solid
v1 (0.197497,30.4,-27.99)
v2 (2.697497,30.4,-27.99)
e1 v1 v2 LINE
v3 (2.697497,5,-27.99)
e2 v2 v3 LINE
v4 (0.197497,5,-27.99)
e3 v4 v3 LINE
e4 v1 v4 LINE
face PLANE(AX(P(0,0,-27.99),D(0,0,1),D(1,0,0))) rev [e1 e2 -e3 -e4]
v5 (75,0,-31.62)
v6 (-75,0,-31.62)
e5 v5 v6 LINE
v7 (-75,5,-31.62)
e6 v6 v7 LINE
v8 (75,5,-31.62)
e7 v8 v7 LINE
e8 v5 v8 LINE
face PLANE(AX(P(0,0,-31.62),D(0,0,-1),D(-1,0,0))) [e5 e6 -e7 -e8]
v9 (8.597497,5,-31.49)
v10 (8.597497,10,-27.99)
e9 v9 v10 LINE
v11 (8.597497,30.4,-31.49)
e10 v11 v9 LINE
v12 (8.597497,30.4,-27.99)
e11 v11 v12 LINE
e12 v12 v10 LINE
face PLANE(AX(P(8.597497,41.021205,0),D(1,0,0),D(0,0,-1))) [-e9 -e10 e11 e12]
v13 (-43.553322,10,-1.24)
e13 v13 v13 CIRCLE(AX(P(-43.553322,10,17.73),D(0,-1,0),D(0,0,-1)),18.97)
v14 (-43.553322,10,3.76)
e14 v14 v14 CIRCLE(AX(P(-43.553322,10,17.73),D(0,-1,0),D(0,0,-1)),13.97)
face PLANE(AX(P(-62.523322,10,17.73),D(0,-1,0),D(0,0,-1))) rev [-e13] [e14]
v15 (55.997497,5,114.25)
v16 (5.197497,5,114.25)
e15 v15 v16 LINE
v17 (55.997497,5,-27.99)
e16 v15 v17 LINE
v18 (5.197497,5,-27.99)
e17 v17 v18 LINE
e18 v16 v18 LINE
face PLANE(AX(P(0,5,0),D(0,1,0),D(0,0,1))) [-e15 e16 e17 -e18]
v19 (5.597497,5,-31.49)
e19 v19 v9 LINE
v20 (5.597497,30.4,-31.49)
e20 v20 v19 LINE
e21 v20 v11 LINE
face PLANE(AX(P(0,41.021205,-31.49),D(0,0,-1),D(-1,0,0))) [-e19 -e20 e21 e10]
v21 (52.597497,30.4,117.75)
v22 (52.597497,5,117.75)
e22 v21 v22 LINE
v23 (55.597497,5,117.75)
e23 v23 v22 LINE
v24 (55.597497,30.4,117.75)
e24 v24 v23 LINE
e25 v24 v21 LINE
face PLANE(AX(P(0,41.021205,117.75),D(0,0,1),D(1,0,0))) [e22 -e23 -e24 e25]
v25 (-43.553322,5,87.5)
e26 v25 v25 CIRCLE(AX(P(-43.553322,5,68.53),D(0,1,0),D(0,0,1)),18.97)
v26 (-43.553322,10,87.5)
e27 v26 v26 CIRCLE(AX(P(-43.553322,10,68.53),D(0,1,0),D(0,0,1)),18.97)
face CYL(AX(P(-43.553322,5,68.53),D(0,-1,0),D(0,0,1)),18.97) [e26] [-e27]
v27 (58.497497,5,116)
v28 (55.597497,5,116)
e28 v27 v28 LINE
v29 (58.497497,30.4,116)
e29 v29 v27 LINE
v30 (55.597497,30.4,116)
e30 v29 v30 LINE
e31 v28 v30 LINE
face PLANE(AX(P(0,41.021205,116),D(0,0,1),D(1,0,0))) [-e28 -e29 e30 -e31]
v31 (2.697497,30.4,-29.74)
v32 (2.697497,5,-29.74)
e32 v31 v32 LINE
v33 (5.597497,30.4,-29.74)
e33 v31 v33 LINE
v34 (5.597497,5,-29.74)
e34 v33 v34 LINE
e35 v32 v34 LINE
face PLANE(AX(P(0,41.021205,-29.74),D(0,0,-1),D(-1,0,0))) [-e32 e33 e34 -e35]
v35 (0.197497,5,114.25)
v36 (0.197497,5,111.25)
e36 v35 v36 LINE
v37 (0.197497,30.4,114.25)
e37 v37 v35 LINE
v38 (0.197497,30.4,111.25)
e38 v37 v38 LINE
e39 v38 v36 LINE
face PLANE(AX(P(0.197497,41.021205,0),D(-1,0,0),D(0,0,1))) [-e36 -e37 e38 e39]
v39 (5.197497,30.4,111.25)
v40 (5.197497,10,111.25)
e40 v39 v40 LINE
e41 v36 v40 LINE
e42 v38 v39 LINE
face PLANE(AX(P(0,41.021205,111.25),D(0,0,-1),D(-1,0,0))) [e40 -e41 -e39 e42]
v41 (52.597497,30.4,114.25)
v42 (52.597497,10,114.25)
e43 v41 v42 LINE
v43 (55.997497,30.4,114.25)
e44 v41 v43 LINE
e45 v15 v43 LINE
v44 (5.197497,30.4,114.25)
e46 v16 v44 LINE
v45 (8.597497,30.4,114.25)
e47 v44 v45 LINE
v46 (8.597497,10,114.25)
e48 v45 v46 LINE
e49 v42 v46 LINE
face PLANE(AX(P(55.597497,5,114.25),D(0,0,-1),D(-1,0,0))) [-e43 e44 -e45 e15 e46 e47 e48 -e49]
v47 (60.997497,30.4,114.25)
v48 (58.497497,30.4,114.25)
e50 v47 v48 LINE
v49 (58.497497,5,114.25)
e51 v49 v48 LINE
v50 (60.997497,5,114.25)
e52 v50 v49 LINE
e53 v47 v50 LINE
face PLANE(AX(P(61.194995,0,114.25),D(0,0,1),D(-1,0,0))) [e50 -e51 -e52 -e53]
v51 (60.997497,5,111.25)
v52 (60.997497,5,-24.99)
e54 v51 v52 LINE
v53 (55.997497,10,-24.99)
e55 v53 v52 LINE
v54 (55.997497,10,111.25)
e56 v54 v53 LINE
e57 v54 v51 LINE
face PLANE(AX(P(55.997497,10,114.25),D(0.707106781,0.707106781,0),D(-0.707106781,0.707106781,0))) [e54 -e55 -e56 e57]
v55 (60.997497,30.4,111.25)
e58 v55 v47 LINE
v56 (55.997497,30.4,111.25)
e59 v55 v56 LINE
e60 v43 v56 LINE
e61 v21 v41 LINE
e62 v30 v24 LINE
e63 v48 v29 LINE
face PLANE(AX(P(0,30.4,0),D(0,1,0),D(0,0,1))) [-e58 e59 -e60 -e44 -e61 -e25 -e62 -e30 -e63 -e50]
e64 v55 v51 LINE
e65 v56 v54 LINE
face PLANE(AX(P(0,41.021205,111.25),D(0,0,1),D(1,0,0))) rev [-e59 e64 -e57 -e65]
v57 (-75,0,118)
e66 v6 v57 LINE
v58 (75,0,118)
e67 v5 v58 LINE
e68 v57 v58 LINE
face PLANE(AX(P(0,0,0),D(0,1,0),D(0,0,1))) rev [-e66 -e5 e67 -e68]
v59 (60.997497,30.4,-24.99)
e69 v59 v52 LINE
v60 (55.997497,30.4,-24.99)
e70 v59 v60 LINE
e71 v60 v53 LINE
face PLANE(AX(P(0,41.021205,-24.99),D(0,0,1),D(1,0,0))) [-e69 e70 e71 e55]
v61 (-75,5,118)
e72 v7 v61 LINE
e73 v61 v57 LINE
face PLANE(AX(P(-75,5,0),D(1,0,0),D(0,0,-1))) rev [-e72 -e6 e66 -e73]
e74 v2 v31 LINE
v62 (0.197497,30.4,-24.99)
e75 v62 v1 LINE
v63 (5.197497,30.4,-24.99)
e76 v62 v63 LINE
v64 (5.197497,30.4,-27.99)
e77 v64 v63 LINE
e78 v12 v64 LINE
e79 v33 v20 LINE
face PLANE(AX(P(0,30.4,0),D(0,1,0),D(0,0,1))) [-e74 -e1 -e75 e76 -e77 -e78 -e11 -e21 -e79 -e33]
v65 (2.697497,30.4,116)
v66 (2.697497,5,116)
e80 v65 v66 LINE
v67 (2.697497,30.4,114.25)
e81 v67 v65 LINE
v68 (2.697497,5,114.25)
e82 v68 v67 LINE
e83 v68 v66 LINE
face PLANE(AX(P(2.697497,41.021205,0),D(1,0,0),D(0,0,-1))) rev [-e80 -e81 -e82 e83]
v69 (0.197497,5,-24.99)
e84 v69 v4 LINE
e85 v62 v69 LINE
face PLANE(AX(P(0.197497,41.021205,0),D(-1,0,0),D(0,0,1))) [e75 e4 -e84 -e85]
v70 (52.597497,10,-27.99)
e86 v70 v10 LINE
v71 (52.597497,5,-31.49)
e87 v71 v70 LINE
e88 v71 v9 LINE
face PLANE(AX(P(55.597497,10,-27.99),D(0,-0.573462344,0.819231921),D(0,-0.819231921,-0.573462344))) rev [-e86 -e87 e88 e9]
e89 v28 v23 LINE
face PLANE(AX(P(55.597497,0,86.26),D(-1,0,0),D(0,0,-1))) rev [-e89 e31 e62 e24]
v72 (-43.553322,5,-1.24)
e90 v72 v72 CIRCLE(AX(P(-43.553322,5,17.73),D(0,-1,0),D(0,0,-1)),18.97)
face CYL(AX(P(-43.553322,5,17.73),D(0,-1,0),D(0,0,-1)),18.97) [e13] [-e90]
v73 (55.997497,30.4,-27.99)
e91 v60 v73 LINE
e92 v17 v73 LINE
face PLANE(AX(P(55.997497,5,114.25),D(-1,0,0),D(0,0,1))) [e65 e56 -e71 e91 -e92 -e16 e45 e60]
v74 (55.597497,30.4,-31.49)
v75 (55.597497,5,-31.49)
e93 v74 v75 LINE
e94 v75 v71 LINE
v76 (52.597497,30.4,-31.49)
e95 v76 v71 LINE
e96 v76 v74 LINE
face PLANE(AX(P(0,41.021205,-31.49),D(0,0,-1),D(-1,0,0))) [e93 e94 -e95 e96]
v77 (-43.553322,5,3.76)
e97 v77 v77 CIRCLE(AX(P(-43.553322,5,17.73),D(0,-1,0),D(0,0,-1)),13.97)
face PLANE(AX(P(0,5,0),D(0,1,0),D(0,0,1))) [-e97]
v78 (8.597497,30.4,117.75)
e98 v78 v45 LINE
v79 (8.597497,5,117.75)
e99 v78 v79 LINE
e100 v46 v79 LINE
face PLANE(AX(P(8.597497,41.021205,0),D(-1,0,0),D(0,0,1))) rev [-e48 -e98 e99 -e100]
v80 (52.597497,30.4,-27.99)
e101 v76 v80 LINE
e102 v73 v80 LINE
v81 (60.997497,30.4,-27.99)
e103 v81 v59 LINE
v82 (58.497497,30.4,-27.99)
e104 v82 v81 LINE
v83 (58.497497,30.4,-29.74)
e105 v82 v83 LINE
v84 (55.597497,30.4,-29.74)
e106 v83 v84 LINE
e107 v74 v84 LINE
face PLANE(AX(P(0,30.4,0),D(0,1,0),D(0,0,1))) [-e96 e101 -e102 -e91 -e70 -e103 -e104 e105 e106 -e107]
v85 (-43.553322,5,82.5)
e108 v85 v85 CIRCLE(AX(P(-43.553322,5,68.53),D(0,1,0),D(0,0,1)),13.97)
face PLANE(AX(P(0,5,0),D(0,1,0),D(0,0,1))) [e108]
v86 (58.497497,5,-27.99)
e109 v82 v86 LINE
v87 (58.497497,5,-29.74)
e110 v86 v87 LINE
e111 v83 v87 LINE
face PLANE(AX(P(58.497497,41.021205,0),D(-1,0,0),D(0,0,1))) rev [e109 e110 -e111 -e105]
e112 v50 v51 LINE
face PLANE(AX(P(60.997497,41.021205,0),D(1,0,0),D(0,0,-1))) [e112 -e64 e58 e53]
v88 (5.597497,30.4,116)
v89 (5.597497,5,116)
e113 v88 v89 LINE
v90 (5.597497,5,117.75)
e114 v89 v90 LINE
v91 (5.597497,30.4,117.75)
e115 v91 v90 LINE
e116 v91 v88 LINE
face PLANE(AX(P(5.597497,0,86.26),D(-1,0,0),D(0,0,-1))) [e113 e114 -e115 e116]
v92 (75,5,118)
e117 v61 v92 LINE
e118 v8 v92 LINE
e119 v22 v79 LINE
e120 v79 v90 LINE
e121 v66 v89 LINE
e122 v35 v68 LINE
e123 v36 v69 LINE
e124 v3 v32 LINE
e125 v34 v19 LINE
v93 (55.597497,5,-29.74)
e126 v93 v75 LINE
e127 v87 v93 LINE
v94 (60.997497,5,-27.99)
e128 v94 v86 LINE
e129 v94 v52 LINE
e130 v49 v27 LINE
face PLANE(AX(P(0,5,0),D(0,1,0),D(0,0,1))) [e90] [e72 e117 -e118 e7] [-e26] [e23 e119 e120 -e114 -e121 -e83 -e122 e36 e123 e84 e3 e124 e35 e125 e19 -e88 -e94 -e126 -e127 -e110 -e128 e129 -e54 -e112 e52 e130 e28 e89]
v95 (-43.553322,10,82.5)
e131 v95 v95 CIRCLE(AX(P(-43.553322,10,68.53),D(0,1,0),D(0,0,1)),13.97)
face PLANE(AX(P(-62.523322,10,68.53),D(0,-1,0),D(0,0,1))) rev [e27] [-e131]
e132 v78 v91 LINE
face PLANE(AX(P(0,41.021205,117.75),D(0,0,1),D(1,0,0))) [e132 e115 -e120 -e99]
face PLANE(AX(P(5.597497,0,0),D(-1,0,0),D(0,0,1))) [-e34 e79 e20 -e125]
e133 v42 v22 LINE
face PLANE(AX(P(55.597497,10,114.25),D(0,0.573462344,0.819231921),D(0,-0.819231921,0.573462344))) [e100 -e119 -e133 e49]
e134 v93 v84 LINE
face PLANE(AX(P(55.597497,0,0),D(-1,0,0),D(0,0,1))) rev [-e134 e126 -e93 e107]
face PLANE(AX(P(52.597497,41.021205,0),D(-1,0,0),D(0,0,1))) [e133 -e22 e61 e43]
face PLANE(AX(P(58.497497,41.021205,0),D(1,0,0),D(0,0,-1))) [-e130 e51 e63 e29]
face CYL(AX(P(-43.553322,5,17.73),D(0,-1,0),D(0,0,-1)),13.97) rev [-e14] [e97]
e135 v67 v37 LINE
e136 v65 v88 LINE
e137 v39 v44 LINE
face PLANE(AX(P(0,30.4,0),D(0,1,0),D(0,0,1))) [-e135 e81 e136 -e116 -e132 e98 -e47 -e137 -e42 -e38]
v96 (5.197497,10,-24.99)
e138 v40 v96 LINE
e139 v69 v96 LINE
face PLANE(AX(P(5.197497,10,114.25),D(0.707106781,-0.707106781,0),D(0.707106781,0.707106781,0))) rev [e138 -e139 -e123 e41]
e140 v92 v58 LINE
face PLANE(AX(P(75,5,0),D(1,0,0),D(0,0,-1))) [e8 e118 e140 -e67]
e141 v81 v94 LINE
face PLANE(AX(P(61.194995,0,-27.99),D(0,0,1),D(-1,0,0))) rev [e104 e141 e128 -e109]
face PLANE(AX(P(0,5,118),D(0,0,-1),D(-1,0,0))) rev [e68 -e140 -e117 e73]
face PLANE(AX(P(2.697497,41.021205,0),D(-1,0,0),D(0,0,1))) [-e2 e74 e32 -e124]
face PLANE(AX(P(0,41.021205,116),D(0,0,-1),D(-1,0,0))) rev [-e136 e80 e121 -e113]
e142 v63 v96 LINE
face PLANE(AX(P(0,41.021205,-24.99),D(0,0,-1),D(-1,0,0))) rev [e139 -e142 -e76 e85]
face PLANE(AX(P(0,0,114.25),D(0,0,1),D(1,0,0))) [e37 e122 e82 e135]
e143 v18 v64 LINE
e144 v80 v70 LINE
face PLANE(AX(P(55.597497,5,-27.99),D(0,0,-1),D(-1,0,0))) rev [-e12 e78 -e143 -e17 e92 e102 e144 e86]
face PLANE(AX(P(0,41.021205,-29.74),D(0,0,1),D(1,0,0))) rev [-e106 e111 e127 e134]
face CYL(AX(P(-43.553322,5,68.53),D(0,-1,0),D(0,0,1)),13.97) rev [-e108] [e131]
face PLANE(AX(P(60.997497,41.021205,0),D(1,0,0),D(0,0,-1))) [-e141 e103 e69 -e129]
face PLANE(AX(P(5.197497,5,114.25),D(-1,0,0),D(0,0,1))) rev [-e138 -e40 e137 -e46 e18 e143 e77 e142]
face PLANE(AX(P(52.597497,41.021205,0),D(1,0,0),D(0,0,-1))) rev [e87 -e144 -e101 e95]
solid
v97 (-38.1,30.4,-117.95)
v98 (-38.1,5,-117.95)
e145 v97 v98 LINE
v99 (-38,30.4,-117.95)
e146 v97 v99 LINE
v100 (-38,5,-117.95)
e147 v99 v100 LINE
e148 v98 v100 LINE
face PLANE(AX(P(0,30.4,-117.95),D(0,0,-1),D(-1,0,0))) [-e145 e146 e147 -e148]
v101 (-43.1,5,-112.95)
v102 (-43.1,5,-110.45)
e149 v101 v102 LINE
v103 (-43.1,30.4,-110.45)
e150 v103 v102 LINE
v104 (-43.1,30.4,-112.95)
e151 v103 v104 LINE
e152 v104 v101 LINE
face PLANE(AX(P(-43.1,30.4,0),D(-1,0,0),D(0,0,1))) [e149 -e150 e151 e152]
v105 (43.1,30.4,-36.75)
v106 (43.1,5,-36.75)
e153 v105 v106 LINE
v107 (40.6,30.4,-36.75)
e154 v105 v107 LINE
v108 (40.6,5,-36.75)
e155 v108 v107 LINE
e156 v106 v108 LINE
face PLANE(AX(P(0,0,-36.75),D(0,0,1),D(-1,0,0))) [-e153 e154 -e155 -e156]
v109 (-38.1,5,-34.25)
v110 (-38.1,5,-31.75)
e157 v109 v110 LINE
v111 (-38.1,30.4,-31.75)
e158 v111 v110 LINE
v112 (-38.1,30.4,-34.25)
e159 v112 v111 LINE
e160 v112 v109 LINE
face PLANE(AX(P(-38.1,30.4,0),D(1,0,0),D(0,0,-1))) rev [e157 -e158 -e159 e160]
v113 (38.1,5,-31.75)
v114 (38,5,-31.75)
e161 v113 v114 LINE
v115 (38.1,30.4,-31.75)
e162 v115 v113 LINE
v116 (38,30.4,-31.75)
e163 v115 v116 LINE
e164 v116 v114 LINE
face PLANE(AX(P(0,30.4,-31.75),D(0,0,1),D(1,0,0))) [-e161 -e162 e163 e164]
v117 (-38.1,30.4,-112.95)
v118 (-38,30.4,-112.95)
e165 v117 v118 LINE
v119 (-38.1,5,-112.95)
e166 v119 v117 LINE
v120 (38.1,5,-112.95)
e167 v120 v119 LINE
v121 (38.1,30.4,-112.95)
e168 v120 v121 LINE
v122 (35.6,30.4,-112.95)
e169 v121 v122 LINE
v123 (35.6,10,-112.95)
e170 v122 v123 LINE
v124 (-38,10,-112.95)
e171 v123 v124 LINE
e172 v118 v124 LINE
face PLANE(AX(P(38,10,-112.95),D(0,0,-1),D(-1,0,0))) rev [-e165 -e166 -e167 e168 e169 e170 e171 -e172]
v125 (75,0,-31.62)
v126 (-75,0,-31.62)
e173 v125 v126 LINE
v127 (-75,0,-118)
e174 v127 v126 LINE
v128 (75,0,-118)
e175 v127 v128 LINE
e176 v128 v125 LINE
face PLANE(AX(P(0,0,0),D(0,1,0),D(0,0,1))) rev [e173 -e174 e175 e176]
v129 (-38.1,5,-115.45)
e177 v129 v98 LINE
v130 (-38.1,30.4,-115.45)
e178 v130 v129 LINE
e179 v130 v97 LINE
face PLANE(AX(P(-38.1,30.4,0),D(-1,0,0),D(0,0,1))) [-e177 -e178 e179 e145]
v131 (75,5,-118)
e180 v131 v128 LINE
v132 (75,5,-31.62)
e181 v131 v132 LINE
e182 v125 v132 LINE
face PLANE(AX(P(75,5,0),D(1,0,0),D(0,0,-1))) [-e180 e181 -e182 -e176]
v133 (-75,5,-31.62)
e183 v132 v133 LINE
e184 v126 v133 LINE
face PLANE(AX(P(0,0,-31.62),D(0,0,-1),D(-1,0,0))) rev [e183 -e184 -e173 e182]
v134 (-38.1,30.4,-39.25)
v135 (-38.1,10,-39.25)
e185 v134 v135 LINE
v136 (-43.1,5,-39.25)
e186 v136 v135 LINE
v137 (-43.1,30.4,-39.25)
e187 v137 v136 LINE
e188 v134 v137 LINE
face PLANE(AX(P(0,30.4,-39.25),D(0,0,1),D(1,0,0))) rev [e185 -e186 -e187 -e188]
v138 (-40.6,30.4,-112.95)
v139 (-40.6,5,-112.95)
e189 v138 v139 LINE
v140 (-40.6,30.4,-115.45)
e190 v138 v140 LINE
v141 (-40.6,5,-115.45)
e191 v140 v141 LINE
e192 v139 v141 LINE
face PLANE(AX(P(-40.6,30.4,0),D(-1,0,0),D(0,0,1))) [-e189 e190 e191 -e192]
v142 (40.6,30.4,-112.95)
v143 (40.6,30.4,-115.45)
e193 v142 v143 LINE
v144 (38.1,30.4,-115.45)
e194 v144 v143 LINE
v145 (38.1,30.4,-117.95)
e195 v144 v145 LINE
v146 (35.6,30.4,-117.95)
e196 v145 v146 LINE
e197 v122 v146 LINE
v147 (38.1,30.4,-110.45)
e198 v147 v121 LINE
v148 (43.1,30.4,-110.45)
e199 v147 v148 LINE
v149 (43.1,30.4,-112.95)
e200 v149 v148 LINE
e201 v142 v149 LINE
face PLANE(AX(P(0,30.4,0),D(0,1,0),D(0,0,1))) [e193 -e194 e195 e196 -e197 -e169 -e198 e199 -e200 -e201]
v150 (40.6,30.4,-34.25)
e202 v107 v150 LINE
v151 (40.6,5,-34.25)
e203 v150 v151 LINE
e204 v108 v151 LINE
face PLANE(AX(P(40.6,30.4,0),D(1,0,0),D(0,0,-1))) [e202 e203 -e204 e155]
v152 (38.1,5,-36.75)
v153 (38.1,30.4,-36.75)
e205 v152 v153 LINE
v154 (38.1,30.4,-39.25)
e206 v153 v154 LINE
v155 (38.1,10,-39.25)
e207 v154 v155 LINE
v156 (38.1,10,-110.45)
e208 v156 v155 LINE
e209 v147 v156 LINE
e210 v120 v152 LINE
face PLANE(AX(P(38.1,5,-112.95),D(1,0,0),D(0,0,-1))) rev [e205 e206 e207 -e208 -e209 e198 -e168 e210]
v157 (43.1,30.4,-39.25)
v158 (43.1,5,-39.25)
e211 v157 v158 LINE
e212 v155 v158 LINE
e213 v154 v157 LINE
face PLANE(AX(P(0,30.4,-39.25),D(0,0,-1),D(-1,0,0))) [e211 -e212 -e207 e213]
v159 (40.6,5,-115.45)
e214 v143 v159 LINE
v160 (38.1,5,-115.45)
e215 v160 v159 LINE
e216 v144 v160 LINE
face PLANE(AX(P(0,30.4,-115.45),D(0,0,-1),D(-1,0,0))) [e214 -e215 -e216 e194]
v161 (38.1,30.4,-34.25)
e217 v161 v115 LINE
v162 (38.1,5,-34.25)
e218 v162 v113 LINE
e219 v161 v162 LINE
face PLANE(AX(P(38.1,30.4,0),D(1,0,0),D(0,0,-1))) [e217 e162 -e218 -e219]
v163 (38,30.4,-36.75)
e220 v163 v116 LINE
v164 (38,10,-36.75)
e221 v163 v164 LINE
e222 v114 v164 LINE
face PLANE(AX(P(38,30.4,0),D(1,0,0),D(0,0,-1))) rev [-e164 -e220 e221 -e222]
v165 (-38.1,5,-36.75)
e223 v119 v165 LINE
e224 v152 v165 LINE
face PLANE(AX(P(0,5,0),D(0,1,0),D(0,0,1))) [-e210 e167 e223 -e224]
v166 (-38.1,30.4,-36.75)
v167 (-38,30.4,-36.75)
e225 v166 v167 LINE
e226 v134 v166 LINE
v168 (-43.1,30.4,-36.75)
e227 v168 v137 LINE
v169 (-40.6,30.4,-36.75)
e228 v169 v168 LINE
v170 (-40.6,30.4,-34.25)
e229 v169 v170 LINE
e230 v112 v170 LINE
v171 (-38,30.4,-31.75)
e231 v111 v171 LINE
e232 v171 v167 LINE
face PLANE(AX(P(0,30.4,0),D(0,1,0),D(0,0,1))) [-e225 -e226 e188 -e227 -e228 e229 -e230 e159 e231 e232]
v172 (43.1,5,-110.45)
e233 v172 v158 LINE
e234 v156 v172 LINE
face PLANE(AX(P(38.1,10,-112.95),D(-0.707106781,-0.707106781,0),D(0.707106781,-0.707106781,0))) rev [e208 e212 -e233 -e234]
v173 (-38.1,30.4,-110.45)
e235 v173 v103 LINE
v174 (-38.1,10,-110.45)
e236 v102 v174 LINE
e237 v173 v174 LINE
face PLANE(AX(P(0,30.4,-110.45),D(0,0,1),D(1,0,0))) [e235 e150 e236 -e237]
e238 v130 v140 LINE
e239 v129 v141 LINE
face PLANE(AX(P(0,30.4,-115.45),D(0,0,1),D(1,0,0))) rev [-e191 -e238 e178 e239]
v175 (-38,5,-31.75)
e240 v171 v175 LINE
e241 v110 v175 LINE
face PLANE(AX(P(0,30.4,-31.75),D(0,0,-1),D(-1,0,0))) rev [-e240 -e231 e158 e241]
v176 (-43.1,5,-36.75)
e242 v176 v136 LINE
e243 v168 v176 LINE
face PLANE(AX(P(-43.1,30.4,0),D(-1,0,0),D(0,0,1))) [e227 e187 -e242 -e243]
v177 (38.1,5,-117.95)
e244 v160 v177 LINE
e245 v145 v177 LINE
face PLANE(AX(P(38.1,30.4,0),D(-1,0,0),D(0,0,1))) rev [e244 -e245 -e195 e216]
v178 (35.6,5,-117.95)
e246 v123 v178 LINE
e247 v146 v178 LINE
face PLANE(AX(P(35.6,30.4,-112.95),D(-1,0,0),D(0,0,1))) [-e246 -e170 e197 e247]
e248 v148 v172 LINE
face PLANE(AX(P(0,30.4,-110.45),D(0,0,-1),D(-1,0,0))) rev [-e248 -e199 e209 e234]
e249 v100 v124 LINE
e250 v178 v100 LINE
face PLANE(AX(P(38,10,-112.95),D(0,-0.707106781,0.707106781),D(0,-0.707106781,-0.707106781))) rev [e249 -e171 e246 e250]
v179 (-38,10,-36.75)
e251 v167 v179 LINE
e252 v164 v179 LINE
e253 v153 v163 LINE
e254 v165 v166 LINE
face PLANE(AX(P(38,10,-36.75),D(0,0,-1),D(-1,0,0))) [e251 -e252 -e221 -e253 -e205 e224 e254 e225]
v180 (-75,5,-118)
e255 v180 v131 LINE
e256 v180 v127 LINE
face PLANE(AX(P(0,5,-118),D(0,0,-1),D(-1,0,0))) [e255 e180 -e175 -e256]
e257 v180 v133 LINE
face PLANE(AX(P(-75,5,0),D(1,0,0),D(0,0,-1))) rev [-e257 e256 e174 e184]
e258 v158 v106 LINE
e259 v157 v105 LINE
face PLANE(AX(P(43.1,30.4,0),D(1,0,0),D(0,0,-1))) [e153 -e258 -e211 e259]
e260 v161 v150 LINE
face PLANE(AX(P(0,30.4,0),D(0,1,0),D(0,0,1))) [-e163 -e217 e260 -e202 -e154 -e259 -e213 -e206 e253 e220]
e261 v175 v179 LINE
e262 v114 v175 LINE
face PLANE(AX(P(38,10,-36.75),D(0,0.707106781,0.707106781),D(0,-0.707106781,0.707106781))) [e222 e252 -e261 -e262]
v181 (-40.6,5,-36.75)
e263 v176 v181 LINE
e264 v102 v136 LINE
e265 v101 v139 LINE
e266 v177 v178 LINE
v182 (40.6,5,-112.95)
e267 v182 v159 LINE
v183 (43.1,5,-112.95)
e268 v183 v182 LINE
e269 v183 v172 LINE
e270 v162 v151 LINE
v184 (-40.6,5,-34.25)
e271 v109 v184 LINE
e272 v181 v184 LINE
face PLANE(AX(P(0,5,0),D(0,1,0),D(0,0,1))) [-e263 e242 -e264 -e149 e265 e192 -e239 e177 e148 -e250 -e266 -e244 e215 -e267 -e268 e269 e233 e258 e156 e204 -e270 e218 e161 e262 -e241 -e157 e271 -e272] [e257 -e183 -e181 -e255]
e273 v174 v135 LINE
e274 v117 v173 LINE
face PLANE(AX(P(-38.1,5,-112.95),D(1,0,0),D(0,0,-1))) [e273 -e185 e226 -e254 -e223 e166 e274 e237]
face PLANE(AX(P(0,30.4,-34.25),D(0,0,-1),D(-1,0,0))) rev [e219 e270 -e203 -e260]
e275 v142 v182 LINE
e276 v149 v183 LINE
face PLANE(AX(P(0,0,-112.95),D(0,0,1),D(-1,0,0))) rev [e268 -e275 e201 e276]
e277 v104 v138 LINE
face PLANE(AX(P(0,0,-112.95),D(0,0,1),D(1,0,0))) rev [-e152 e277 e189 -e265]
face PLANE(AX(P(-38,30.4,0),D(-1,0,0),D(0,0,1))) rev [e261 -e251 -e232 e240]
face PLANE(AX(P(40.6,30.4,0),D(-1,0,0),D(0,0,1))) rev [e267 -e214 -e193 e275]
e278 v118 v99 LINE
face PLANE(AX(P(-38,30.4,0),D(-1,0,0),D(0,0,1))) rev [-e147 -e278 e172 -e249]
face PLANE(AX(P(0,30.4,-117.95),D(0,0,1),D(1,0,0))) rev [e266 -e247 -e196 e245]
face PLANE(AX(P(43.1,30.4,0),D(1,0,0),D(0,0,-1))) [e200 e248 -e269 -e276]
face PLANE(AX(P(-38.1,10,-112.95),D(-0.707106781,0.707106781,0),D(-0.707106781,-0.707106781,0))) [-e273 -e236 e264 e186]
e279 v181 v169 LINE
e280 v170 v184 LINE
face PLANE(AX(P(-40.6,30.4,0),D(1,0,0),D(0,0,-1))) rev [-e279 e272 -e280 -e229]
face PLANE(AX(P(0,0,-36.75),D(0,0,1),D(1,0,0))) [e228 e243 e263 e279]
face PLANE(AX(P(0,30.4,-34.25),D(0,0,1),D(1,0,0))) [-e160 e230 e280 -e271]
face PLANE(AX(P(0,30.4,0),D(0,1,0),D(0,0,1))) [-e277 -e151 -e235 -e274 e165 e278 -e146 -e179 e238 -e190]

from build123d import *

# Parameters (mm, degrees)
OUTLINE_W                    = 75
OUTLINE_H                    = 236
THE_FLOOR_DEPTH              = 5
CABINET_SIDE_RESTRAINT_DEPTH = 76.2
BOSS_EXTRUDE7_DEPTH          = 38
BOSS_EXTRUDE15_DEPTH         = 25.4
SIDE_RESTRAINTS_DEPTH        = 71.12
SKETCH17_W                   = 5
SKETCH17_H                   = 5
BOSS_EXTRUDE16_DEPTH         = 25
BOSS_EXTRUDE17_REACH         = 144.106
SKETCH24_W                   = 5
SKETCH24_H                   = 3
SKETCH24_W_2                 = 3
SKETCH24_H_2                 = 3.5


# Read off the part's stored shape, not the designer's step: Boss-Extrude15
with BuildPart() as part:
    # outline → the floor (new body)
    with BuildSketch(Plane(origin=(0, 0, 0), x_dir=(1, 0, 0), z_dir=(0, 1, 0))):
        with Locations((37.5, 0)):
            Rectangle(OUTLINE_W, OUTLINE_H)
        with Locations((-37.5, 0)):
            Rectangle(OUTLINE_W, OUTLINE_H)
    extrude(amount=THE_FLOOR_DEPTH)

    # Sketch7 → cabinet side restraint (add)
    with BuildSketch(Plane.XY.offset(-36.75)):
        Polygon((-38.1, 5), (-38.1, 10), (-43.1, 5), align=None)
    cabinet_side_restraint = extrude(amount=-CABINET_SIDE_RESTRAINT_DEPTH)

    # Mirror1: cabinet side restraint across plane
    add(cabinet_side_restraint.mirror(Plane(origin=(0, 0, 0), x_dir=(0, 0, 1), z_dir=(1, 0, 0))))

    # Sketch9 → Boss-Extrude7 (add, symmetric)
    with BuildSketch(Plane(origin=(0, 0, 0), x_dir=(0, 0, -1), z_dir=(1, 0, 0))):
        Polygon((112.95, 5), (117.95, 5), (112.95, 10), align=None)
    boss_extrude7 = extrude(amount=BOSS_EXTRUDE7_DEPTH, both=True)

    # Mirror2: Boss-Extrude7 across plane
    add(boss_extrude7.mirror(Plane.XY.offset(-74.85)))

    # Boss-Extrude15 outline → Boss-Extrude15 (add)
    with BuildSketch(Plane(origin=(0, 5, 0), x_dir=(1, 0, 0), z_dir=(0, 1, 0))):
        Polygon((38.1, 112.95), (38.1, 110.45), (43.1, 110.45), (43.1, 112.95), (40.6, 112.95), (40.6, 115.45), (38.1, 115.45), (38.1, 117.95), (35.6, 117.95), (35.6, 112.95), align=None)
        Polygon((43.1, 39.25), (38.1, 39.25), (38.1, 36.75), (38, 36.75), (38, 31.75), (38.1, 31.75), (38.1, 34.25), (40.6, 34.25), (40.6, 36.75), (43.1, 36.75), align=None)
        Polygon((-38.1, 112.95), (-38, 112.95), (-38, 117.95), (-38.1, 117.95), (-38.1, 115.45), (-40.6, 115.45), (-40.6, 112.95), (-43.1, 112.95), (-43.1, 110.45), (-38.1, 110.45), align=None)
        Polygon((-38, 31.75), (-38, 36.75), (-38.1, 36.75), (-38.1, 39.25), (-43.1, 39.25), (-43.1, 36.75), (-40.6, 36.75), (-40.6, 34.25), (-38.1, 34.25), (-38.1, 31.75), align=None)
    extrude(amount=BOSS_EXTRUDE15_DEPTH)

    # Sketch12 → side restraints (add, symmetric)
    with BuildSketch(Plane.XY.offset(43.13)):
        Polygon((0.197497467, 5), (5.197497467, 5), (5.197497467, 10), align=None)
    side_restraints = extrude(amount=SIDE_RESTRAINTS_DEPTH, both=True)

    # restraint mirror: side restraints across plane
    add(side_restraints.mirror(Plane(origin=(30.597497467, 0, 0), x_dir=(0, 0, 1), z_dir=(1, 0, 0))))

    # Sketch17 → Revolve1 (revolve)
    with BuildSketch(Plane.XY.offset(17.73), mode=Mode.PRIVATE) as revolve1_sk:
        with Locations((-60.023321963, 7.5)):
            Rectangle(SKETCH17_W, SKETCH17_H)
    revolve1 = revolve(revolve1_sk.sketch.rotate(Axis((-43.553321963, 5, 17.73), (0, 1, 0)), 270), axis=Axis((-43.553321963, 5, 17.73), (0, 1, 0)))

    # Mirror7: Revolve1 across plane
    add(revolve1.mirror(Plane.XY.offset(43.13)))

    # Sketch23 → Boss-Extrude16 (add, symmetric)
    with BuildSketch(Plane(origin=(30.597497467, 0, 0), x_dir=(0, 0, -1), z_dir=(1, 0, 0))):
        Polygon((27.99, 5), (27.99, 10), (31.49, 5), align=None)
    boss_extrude16 = extrude(amount=BOSS_EXTRUDE16_DEPTH, both=True)

    # Mirror10: Boss-Extrude16 across plane
    add(boss_extrude16.mirror(Plane.XY.offset(43.13)))

    # Boss-Extrude17: up to this face of the body (flat: up to its plane)
    boss_extrude17_end = Plane(part.part.faces().sort_by_distance((-40.127922078, 30.4, -37.090909091))[0])
    # Sketch24 → Boss-Extrude17 (add, up to the picked face)
    with BuildSketch(Plane(origin=(0, 5, 0), x_dir=(1, 0, 0), z_dir=(0, 1, 0)), mode=Mode.PRIVATE) as boss_extrude17_sk1:
        with Locations((2.697497467, 26.49)):
            Rectangle(SKETCH24_W, SKETCH24_H)
    boss_extrude17_tool1 = split(extrude(boss_extrude17_sk1.sketch, amount=BOSS_EXTRUDE17_REACH, mode=Mode.PRIVATE), bisect_by=boss_extrude17_end, keep=Keep.BOTH, mode=Mode.PRIVATE)
    # Sketch24 → Boss-Extrude17 (add, up to the picked face)
    with BuildSketch(Plane(origin=(0, 5, 0), x_dir=(1, 0, 0), z_dir=(0, 1, 0)), mode=Mode.PRIVATE) as boss_extrude17_sk2:
        Polygon((5.597497467, 27.99), (5.597497467, 29.74), (2.697497467, 29.74), (2.697497467, 27.99), (5.197497467, 27.99), align=None)
    boss_extrude17_tool2 = split(extrude(boss_extrude17_sk2.sketch, amount=BOSS_EXTRUDE17_REACH, mode=Mode.PRIVATE), bisect_by=boss_extrude17_end, keep=Keep.BOTH, mode=Mode.PRIVATE)
    # Sketch24 → Boss-Extrude17 (add, up to the picked face)
    with BuildSketch(Plane(origin=(0, 5, 0), x_dir=(1, 0, 0), z_dir=(0, 1, 0)), mode=Mode.PRIVATE) as boss_extrude17_sk3:
        with Locations((7.097497467, 29.74)):
            Rectangle(SKETCH24_W_2, SKETCH24_H_2)
    boss_extrude17_tool3 = split(extrude(boss_extrude17_sk3.sketch, amount=BOSS_EXTRUDE17_REACH, mode=Mode.PRIVATE), bisect_by=boss_extrude17_end, keep=Keep.BOTH, mode=Mode.PRIVATE)
    # Sketch24 → Boss-Extrude17 (add, up to the picked face)
    with BuildSketch(Plane(origin=(0, 5, 0), x_dir=(1, 0, 0), z_dir=(0, 1, 0)), mode=Mode.PRIVATE) as boss_extrude17_sk4:
        with Locations((54.097497467, 29.74)):
            Rectangle(SKETCH24_W_2, SKETCH24_H_2)
    boss_extrude17_tool4 = split(extrude(boss_extrude17_sk4.sketch, amount=BOSS_EXTRUDE17_REACH, mode=Mode.PRIVATE), bisect_by=boss_extrude17_end, keep=Keep.BOTH, mode=Mode.PRIVATE)
    # Sketch24 → Boss-Extrude17 (add, up to the picked face)
    with BuildSketch(Plane(origin=(0, 5, 0), x_dir=(1, 0, 0), z_dir=(0, 1, 0)), mode=Mode.PRIVATE) as boss_extrude17_sk5:
        Polygon((55.597497467, 29.74), (55.597497467, 27.99), (55.997497467, 27.99), (58.497497467, 27.99), (58.497497467, 29.74), align=None)
    boss_extrude17_tool5 = split(extrude(boss_extrude17_sk5.sketch, amount=BOSS_EXTRUDE17_REACH, mode=Mode.PRIVATE), bisect_by=boss_extrude17_end, keep=Keep.BOTH, mode=Mode.PRIVATE)
    # Sketch24 → Boss-Extrude17 (add, up to the picked face)
    with BuildSketch(Plane(origin=(0, 5, 0), x_dir=(1, 0, 0), z_dir=(0, 1, 0)), mode=Mode.PRIVATE) as boss_extrude17_sk6:
        with Locations((58.497497467, 26.49)):
            Rectangle(SKETCH24_W, SKETCH24_H)
    boss_extrude17_tool6 = split(extrude(boss_extrude17_sk6.sketch, amount=BOSS_EXTRUDE17_REACH, mode=Mode.PRIVATE), bisect_by=boss_extrude17_end, keep=Keep.BOTH, mode=Mode.PRIVATE)
    # Sketch24 → Boss-Extrude17 (add, up to the picked face)
    with BuildSketch(Plane(origin=(0, 5, 0), x_dir=(1, 0, 0), z_dir=(0, 1, 0)), mode=Mode.PRIVATE) as boss_extrude17_sk7:
        with Locations((58.497497467, -112.75)):
            Rectangle(SKETCH24_W, SKETCH24_H)
    boss_extrude17_tool7 = split(extrude(boss_extrude17_sk7.sketch, amount=BOSS_EXTRUDE17_REACH, mode=Mode.PRIVATE), bisect_by=boss_extrude17_end, keep=Keep.BOTH, mode=Mode.PRIVATE)
    # Sketch24 → Boss-Extrude17 (add, up to the picked face)
    with BuildSketch(Plane(origin=(0, 5, 0), x_dir=(1, 0, 0), z_dir=(0, 1, 0)), mode=Mode.PRIVATE) as boss_extrude17_sk8:
        Polygon((55.997497467, -114.25), (55.597497467, -114.25), (55.597497467, -116), (58.497497467, -116), (58.497497467, -114.25), align=None)
    boss_extrude17_tool8 = split(extrude(boss_extrude17_sk8.sketch, amount=BOSS_EXTRUDE17_REACH, mode=Mode.PRIVATE), bisect_by=boss_extrude17_end, keep=Keep.BOTH, mode=Mode.PRIVATE)
    # Sketch24 → Boss-Extrude17 (add, up to the picked face)
    with BuildSketch(Plane(origin=(0, 5, 0), x_dir=(1, 0, 0), z_dir=(0, 1, 0)), mode=Mode.PRIVATE) as boss_extrude17_sk9:
        with Locations((54.097497467, -116)):
            Rectangle(SKETCH24_W_2, SKETCH24_H_2)
    boss_extrude17_tool9 = split(extrude(boss_extrude17_sk9.sketch, amount=BOSS_EXTRUDE17_REACH, mode=Mode.PRIVATE), bisect_by=boss_extrude17_end, keep=Keep.BOTH, mode=Mode.PRIVATE)
    # Sketch24 → Boss-Extrude17 (add, up to the picked face)
    with BuildSketch(Plane(origin=(0, 5, 0), x_dir=(1, 0, 0), z_dir=(0, 1, 0)), mode=Mode.PRIVATE) as boss_extrude17_sk10:
        with Locations((7.097497467, -116)):
            Rectangle(SKETCH24_W_2, SKETCH24_H_2)
    boss_extrude17_tool10 = split(extrude(boss_extrude17_sk10.sketch, amount=BOSS_EXTRUDE17_REACH, mode=Mode.PRIVATE), bisect_by=boss_extrude17_end, keep=Keep.BOTH, mode=Mode.PRIVATE)
    # Sketch24 → Boss-Extrude17 (add, up to the picked face)
    with BuildSketch(Plane(origin=(0, 5, 0), x_dir=(1, 0, 0), z_dir=(0, 1, 0)), mode=Mode.PRIVATE) as boss_extrude17_sk11:
        Polygon((5.597497467, -116), (5.597497467, -114.25), (5.197497467, -114.25), (2.697497467, -114.25), (2.697497467, -116), align=None)
    boss_extrude17_tool11 = split(extrude(boss_extrude17_sk11.sketch, amount=BOSS_EXTRUDE17_REACH, mode=Mode.PRIVATE), bisect_by=boss_extrude17_end, keep=Keep.BOTH, mode=Mode.PRIVATE)
    # Sketch24 → Boss-Extrude17 (add, up to the picked face)
    with BuildSketch(Plane(origin=(0, 5, 0), x_dir=(1, 0, 0), z_dir=(0, 1, 0)), mode=Mode.PRIVATE) as boss_extrude17_sk12:
        with Locations((2.697497467, -112.75)):
            Rectangle(SKETCH24_W, SKETCH24_H)
    boss_extrude17_tool12 = split(extrude(boss_extrude17_sk12.sketch, amount=BOSS_EXTRUDE17_REACH, mode=Mode.PRIVATE), bisect_by=boss_extrude17_end, keep=Keep.BOTH, mode=Mode.PRIVATE)
    add(boss_extrude17_tool1.solids().sort_by(Axis((2.697497, 5, -26.49), (0, 1, 0)))[0])
    add(boss_extrude17_tool2.solids().sort_by(Axis((4.147497, 5, -28.865), (0, 1, 0)))[0])
    add(boss_extrude17_tool3.solids().sort_by(Axis((7.097497, 5, -29.74), (0, 1, 0)))[0])
    add(boss_extrude17_tool4.solids().sort_by(Axis((54.097497, 5, -29.74), (0, 1, 0)))[0])
    add(boss_extrude17_tool5.solids().sort_by(Axis((57.047497, 5, -28.865), (0, 1, 0)))[0])
    add(boss_extrude17_tool6.solids().sort_by(Axis((58.497497, 5, -26.49), (0, 1, 0)))[0])
    add(boss_extrude17_tool7.solids().sort_by(Axis((58.497497, 5, 112.75), (0, 1, 0)))[0])
    add(boss_extrude17_tool8.solids().sort_by(Axis((57.047497, 5, 115.125), (0, 1, 0)))[0])
    add(boss_extrude17_tool9.solids().sort_by(Axis((54.097497, 5, 116), (0, 1, 0)))[0])
    add(boss_extrude17_tool10.solids().sort_by(Axis((7.097497, 5, 116), (0, 1, 0)))[0])
    add(boss_extrude17_tool11.solids().sort_by(Axis((4.147497, 5, 115.125), (0, 1, 0)))[0])
    add(boss_extrude17_tool12.solids().sort_by(Axis((2.697497, 5, 112.75), (0, 1, 0)))[0])


with BuildPart() as body_2:
    # Split1: the piece on the far side of the plane
    add(part.part)
    split(bisect_by=Plane(origin=(0, 0, -31.62), x_dir=(-1, 0, 0), z_dir=(0, 0, -1)), keep=Keep.BOTTOM)


with BuildPart() as part_1:
    add(part.part)

    # Split1
    split(bisect_by=Plane(origin=(0, 0, -31.62), x_dir=(-1, 0, 0), z_dir=(0, 0, -1)), keep=Keep.TOP)


solid = Compound([body_2.part, part_1.part])
